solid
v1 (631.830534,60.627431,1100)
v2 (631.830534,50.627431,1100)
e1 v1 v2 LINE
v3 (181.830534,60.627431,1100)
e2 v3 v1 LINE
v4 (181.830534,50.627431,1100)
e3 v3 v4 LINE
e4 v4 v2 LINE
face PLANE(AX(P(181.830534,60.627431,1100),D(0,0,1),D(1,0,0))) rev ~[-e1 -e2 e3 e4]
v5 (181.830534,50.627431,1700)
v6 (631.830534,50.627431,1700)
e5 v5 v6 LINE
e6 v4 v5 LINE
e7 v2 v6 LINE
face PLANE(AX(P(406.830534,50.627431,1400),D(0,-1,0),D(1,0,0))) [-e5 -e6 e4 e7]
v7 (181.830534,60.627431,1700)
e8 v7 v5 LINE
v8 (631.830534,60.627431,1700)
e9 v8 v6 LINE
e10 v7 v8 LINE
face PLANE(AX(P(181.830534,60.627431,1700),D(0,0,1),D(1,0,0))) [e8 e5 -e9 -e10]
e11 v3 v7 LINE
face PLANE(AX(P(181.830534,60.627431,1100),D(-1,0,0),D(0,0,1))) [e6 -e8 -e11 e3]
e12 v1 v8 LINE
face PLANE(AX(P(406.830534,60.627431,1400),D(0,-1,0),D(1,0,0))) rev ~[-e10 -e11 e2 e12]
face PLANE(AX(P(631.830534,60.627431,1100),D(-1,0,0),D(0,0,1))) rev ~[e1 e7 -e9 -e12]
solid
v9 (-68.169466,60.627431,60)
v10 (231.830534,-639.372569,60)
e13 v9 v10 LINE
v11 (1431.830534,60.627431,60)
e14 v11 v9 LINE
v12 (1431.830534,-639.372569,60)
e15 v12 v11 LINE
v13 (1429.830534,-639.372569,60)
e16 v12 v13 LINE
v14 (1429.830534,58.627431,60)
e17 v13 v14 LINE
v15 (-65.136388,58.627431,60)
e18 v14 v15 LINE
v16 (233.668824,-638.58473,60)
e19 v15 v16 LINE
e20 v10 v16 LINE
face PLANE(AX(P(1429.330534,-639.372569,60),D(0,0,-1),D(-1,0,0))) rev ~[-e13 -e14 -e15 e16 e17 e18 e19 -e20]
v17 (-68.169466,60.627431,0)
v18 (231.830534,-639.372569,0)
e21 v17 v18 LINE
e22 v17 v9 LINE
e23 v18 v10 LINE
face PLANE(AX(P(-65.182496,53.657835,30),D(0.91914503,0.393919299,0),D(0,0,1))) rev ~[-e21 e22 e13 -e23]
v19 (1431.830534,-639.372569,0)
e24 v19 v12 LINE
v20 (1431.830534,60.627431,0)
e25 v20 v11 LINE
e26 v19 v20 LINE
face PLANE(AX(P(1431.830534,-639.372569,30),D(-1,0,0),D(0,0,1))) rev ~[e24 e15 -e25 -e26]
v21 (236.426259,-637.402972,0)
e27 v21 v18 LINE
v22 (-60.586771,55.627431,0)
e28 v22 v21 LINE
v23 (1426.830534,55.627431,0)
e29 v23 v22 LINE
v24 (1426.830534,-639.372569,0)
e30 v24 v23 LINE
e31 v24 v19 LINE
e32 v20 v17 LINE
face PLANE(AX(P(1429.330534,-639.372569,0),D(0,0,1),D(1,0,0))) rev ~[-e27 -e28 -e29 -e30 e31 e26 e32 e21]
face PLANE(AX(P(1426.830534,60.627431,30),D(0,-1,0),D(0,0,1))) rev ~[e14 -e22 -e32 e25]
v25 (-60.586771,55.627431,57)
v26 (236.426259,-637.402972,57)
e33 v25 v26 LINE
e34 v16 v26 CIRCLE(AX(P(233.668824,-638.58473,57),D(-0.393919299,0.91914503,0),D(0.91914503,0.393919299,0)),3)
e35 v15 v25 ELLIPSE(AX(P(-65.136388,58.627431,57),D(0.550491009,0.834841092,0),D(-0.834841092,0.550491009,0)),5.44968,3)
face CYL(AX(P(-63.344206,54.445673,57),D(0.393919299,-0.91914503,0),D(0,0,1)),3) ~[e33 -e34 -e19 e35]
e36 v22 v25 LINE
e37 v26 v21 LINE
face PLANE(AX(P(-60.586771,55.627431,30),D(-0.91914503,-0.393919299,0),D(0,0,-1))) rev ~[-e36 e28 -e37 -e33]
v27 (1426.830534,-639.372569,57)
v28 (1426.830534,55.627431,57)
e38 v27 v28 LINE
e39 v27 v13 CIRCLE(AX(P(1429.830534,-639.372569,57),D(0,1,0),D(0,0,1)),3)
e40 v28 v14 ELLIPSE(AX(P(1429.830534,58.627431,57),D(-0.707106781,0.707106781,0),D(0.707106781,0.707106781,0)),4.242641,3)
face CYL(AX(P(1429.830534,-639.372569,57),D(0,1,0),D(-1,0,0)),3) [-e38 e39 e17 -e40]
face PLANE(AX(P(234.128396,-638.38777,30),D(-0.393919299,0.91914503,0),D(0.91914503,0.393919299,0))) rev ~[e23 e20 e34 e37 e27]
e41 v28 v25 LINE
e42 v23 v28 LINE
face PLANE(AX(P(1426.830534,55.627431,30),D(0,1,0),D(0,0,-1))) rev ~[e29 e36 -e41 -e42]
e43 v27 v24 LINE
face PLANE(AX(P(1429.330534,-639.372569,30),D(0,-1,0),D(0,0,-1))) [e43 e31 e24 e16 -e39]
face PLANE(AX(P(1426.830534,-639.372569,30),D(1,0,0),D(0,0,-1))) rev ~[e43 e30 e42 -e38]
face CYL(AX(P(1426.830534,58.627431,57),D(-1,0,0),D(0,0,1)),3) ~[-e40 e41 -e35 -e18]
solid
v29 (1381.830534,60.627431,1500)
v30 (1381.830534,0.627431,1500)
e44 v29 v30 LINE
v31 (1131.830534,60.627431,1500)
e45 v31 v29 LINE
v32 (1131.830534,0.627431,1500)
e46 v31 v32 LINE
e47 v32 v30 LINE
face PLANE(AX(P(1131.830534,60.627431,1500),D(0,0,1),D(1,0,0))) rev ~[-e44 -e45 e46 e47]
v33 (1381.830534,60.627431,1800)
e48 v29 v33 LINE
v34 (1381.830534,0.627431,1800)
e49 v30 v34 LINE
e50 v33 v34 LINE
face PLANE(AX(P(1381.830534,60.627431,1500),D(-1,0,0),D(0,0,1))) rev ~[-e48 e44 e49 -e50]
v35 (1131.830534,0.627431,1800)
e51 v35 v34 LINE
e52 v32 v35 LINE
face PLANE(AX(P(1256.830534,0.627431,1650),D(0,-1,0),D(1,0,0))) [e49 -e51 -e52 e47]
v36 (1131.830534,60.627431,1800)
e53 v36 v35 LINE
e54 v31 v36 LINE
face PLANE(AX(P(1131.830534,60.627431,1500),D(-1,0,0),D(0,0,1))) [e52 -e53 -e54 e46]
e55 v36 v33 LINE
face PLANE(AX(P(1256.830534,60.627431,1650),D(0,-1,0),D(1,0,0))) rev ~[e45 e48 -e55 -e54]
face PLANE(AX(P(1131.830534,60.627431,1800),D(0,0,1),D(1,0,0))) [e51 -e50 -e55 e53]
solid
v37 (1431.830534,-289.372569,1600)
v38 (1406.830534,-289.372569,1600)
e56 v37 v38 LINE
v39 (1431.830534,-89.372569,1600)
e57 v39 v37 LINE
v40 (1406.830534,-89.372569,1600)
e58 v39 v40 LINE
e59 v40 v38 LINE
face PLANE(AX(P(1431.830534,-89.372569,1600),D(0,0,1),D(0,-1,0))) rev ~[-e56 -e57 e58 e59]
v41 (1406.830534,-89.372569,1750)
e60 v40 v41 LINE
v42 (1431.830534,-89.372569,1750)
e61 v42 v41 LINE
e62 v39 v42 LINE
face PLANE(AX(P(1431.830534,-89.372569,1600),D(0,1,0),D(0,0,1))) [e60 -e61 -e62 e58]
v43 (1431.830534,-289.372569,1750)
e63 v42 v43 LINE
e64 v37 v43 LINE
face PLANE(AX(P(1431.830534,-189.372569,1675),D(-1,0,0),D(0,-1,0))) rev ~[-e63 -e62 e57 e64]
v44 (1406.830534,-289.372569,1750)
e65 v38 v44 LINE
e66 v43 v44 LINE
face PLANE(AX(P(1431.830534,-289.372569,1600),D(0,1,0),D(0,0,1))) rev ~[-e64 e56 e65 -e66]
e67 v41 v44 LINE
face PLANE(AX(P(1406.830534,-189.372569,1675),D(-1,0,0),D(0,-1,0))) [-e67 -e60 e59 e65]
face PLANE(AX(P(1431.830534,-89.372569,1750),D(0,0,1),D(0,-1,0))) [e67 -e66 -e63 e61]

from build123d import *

# Parameters (mm, degrees)
F3_W      = 5
F3_H      = 60
F5_R      = 3
F6_W      = 250
F6_H      = 300
F7_DEPTH  = 60
F8_W      = 200
F8_H      = 150
F9_DEPTH  = 25
F10_W     = 450
F10_H     = 600
F11_DEPTH = 10


with BuildPart() as f4:
    # F4: sweep along a path in F0
    with BuildLine(Plane.XY) as f4_path:
        Line((1426.8305338016, -639.3725686498), (1426.8305338016, 55.6274313502))
        Line((1426.8305338016, 55.6274313502), (-60.5867711228, 55.6274313502))
        Line((-60.5867711228, 55.6274313502), (236.4262589517, -637.4029721569))
    # F3 (on line) → F4 (sweep)
    with BuildSketch(Plane.XZ.offset(639.3725686498)):
        with Locations((1429.3305338016, 30)):
            Rectangle(F3_W, F3_H)
    sweep(path=f4_path.line, transition=Transition.RIGHT)

    # F5
    f5_edges = [f4.edges().sort_by_distance(p)[0] for p in [
        (1426.830534, -291.872569, 60),
        (683.121881, 55.627431, 60),
        (87.919744, -290.88777, 60),
    ]]
    fillet(f5_edges, radius=F5_R)


with BuildPart() as f7:
    # F6 (on face) → F7 (new body)
    with BuildSketch(Plane.XZ.offset(-60.6274313502)):
        with Locations((1256.8305338016, 1650)):
            Rectangle(F6_W, F6_H)
    extrude(amount=F7_DEPTH)


with BuildPart() as f9:
    # F8 (on face) → F9 (new body)
    with BuildSketch(Plane(origin=(1431.8305338016, 0, 0), x_dir=(0, -1, 0), z_dir=(-1, 0, 0))):
        with Locations((189.3725686498, 1675)):
            Rectangle(F8_W, F8_H)
    extrude(amount=F9_DEPTH)


with BuildPart() as f11:
    # F10 (on face) → F11 (new body)
    with BuildSketch(Plane.XZ.offset(-60.6274313502)):
        with Locations((406.8305338016, 1400)):
            Rectangle(F10_W, F10_H)
    extrude(amount=F11_DEPTH)


solid = Compound([f4.part, f7.part, f9.part, f11.part])
